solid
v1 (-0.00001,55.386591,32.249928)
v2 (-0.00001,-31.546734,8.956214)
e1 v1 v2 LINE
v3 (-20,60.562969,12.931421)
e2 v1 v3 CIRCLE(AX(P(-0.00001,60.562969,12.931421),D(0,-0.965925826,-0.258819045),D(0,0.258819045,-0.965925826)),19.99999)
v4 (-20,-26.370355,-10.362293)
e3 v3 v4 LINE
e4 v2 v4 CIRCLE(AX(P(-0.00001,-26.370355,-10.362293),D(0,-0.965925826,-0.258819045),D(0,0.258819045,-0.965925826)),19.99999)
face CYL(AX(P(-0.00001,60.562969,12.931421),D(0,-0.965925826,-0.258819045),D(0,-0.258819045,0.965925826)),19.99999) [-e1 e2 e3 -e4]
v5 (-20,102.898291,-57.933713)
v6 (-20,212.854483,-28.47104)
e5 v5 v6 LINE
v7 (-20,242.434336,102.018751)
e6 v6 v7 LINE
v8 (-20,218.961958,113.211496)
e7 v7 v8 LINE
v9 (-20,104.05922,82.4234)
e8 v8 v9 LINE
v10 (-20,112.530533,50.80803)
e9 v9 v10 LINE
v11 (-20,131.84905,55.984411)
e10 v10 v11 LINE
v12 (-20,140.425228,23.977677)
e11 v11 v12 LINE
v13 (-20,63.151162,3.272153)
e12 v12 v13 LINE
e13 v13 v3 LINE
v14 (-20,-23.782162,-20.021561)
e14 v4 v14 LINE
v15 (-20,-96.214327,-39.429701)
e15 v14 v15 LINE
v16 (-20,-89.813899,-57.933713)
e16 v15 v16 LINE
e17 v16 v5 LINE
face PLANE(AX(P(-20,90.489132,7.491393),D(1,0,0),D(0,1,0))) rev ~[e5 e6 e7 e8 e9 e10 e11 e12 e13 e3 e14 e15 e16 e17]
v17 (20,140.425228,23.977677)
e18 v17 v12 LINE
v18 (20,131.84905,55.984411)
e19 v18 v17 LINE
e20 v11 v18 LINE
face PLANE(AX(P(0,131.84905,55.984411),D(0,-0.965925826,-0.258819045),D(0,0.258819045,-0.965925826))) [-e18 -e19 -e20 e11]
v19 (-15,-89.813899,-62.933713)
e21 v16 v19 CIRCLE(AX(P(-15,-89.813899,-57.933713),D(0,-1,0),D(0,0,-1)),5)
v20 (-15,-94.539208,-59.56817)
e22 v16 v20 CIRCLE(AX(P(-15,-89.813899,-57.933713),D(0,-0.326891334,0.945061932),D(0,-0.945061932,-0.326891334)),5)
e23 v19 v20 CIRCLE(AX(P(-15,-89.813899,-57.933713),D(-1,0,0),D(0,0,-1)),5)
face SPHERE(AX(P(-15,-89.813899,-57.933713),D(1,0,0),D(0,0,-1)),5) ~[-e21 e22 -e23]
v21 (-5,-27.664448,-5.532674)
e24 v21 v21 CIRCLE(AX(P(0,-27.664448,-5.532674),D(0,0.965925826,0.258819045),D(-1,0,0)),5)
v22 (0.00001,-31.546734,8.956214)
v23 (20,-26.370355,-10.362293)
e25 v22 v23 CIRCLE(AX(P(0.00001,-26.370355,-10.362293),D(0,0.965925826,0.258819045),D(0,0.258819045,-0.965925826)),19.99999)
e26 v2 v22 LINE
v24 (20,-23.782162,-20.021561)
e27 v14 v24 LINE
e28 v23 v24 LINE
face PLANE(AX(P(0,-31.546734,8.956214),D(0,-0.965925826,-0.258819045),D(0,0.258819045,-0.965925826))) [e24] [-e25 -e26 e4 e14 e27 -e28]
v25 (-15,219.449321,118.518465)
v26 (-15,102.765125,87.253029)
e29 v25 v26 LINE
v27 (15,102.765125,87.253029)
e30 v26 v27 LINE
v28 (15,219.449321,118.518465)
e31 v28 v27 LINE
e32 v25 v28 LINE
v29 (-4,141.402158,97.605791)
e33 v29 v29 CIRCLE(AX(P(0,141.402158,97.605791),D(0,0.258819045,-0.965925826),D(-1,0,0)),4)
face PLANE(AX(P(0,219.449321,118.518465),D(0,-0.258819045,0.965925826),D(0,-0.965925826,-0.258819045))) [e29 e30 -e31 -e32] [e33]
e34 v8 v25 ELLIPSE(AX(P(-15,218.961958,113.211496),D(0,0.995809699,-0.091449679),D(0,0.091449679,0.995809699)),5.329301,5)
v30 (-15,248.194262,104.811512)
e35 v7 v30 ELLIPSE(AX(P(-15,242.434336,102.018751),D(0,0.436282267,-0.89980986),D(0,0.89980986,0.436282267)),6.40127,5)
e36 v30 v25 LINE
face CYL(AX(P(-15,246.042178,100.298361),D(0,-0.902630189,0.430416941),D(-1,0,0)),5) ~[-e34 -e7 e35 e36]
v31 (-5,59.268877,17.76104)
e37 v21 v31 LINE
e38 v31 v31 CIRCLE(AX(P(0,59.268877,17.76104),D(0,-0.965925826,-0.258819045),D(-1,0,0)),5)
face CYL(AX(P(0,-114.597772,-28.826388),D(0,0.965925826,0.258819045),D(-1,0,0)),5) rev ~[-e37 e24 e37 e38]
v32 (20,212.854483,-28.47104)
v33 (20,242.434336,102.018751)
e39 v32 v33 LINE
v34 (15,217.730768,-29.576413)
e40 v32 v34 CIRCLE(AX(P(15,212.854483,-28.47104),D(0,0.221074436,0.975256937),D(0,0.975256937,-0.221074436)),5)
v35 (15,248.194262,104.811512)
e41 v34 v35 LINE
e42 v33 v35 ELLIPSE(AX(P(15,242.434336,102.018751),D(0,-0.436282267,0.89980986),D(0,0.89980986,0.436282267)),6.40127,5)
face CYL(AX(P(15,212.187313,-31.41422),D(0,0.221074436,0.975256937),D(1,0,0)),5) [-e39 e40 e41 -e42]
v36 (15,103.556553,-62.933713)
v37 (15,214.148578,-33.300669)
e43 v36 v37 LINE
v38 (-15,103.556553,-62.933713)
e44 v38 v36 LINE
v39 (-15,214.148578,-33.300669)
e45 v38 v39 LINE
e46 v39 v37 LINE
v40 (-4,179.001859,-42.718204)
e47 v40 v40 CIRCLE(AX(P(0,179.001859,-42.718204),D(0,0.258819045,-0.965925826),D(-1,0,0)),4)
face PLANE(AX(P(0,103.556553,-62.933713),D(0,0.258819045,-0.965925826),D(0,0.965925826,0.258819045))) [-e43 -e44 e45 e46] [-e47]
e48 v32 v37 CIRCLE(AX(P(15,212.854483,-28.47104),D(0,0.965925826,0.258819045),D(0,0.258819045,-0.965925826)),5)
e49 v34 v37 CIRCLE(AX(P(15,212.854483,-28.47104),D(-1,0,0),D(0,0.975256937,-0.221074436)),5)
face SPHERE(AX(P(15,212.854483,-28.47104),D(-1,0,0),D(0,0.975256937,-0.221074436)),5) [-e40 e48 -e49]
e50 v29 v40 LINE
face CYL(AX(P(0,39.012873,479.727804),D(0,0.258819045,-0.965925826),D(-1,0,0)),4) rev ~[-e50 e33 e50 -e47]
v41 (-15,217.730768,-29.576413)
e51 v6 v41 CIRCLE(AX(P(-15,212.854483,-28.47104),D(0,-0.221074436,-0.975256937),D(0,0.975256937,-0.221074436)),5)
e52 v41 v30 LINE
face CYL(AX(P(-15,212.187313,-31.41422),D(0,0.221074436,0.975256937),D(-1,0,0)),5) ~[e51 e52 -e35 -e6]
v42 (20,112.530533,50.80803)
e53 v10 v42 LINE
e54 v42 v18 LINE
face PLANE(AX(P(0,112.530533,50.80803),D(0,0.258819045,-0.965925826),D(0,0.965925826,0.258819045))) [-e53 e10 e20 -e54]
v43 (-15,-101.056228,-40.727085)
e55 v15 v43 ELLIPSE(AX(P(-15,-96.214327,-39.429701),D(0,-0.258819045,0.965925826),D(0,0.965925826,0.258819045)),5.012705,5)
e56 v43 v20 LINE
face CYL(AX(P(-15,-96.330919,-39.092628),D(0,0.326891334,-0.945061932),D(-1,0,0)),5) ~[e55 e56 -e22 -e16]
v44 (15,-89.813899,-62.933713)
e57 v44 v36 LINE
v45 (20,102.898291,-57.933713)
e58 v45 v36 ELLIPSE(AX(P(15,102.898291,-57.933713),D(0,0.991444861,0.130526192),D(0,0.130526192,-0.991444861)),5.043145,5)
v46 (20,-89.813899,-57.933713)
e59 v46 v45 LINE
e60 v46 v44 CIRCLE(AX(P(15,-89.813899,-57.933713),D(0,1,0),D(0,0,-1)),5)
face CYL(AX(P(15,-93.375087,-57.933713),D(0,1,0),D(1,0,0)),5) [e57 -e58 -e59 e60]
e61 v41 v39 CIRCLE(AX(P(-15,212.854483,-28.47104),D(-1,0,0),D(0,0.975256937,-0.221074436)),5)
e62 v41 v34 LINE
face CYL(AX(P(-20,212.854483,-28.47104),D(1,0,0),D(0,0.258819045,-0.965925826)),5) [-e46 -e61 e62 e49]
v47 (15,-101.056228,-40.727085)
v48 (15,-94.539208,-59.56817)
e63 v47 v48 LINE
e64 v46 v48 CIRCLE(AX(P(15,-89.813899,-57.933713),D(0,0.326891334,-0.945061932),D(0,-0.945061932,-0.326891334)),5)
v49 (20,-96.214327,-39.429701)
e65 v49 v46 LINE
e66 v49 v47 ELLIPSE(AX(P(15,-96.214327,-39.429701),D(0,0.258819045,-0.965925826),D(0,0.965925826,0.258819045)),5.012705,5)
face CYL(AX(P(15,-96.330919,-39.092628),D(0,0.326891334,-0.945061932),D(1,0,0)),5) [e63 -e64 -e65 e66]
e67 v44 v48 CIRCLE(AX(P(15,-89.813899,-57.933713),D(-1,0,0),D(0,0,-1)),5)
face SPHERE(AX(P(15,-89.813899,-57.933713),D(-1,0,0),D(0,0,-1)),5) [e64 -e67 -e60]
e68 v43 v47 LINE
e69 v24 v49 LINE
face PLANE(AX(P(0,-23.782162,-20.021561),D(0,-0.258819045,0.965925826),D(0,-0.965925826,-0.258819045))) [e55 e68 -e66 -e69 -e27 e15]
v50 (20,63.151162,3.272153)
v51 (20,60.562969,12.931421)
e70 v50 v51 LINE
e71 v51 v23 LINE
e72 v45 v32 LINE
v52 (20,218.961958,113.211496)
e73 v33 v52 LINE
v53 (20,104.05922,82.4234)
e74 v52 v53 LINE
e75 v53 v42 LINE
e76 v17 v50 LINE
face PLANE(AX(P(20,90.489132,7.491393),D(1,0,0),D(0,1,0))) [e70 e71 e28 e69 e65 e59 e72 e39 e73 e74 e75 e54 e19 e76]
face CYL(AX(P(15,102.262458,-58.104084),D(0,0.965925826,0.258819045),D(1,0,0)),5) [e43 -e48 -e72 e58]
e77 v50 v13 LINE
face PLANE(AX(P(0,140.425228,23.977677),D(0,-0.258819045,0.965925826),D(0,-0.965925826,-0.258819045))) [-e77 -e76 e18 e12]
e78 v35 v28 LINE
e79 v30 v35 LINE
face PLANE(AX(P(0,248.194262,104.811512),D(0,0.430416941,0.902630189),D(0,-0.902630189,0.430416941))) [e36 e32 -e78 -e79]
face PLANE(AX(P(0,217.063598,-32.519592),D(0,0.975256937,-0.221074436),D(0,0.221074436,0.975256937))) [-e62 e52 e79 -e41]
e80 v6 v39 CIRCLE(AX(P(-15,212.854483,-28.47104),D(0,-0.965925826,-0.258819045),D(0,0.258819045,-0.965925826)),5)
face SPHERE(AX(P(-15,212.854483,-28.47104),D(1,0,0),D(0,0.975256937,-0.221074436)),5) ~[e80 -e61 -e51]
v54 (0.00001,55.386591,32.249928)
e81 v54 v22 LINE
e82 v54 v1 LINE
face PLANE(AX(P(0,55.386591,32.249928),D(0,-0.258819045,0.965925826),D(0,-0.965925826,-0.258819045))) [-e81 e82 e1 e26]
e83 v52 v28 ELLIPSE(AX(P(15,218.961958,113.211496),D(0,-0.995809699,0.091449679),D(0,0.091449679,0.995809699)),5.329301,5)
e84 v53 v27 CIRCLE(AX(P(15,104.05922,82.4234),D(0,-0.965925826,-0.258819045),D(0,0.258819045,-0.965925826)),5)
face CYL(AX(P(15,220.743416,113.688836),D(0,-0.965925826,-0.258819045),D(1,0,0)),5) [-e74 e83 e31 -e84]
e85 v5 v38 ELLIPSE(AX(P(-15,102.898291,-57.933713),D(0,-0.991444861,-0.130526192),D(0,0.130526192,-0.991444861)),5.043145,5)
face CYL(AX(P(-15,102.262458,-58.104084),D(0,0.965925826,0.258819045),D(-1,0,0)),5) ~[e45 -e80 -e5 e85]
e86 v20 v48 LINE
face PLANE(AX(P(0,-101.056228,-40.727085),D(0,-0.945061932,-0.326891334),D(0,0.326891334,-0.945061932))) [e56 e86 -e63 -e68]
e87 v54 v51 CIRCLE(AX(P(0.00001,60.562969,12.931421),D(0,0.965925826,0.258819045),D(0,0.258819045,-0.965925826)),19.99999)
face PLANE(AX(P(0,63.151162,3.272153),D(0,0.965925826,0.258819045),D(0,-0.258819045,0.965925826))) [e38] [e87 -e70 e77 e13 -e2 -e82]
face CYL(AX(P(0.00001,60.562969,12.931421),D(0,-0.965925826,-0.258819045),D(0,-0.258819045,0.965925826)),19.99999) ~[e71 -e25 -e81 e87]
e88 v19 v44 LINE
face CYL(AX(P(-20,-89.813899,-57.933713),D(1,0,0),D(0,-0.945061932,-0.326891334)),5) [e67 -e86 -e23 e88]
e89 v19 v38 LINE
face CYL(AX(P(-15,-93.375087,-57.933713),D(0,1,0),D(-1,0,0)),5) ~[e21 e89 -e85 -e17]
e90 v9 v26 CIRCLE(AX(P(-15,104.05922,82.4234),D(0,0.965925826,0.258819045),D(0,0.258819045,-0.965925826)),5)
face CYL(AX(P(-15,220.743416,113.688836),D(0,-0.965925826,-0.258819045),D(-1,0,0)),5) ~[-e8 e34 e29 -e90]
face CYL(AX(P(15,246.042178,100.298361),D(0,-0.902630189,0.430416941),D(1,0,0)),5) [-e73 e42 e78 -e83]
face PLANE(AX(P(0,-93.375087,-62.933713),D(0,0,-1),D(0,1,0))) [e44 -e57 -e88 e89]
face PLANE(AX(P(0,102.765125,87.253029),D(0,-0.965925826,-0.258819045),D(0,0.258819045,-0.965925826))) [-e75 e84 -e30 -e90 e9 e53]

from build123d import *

# Parameters (mm, degrees)
F1_DEPTH = 20
F3_D     = 10
F3_DEPTH = 90
F3_TIP   = 3.0043030951
F4_R     = 19.99999
F5_R     = 5
F7_D     = 8


# Not quite as in the source:
# - a fillet or chamfer is up to 0.001 mm smaller than in the source, because OpenCascade refuses the exact size


with BuildPart() as f1:
    # F0 (on Right) → F1 (new body, symmetric)
    with BuildSketch(Plane.YZ):
        Polygon((55.3865908633, 32.2499277236), (-31.5467335027, 8.9562136644), (-23.7821621496, -20.0215611243), (-101.0562282528, -40.7270847325), (-93.3750867844, -62.9337131977), (103.556553434, -62.9337131977), (217.0635979758, -32.5195922775), (248.1942623854, 104.8115119338), (219.449320977, 118.5184651202), (102.765125102, 87.253029066), (112.5305330656, 50.8080303895), (131.8490495913, 55.9844112915), (140.4252283195, 23.9776765432), (63.1511622164, 3.272152935), align=None)
    extrude(amount=F1_DEPTH, both=True)

    # F3
    with Locations(Plane(origin=(0, -27.1944496451, -7.286730821), x_dir=(1, 0, 0), z_dir=(0, -0.9659258263, -0.2588190451))):
        with Locations((0, 1.8159335255)):
            Hole(F3_D / 2, depth=F3_DEPTH)
            with Locations((0, 0, -(F3_DEPTH + F3_TIP / 2))):  # 118° drill point
                Cone(0, F3_D / 2, F3_TIP, mode=Mode.SUBTRACT)

    # F4 (radius 20 in the source; OpenCascade refuses exactly that, so slightly less here)
    f4_edges = [f1.edges().sort_by_distance(p)[0] for p in [
        (20, 11.919929, 20.603071),
        (-20, 11.919929, 20.603071),
    ]]
    fillet(f4_edges, radius=F4_R)

    # F5
    f5_edges = [f1.edges().sort_by_distance(p)[0] for p in [
        (-20, -97.215658, -51.830399),
        (20, -97.215658, -51.830399),
        (0, -93.375087, -62.933713),
        (20, 5.090733, -62.933713),
        (-20, 5.090733, -62.933713),
        (20, 160.310076, -47.726653),
        (-20, 160.310076, -47.726653),
        (0, 217.063598, -32.519592),
        (20, 232.62893, 36.14596),
        (-20, 232.62893, 36.14596),
        (-20, 233.821792, 111.664989),
        (20, 233.821792, 111.664989),
        (20, 161.107223, 102.885747),
        (-20, 161.107223, 102.885747),
    ]]
    fillet(f5_edges, radius=F5_R)

    # F7 (through all)
    with Locations(Plane(origin=(0, -14.9292991962, 55.7169031216), x_dir=(1, 0, 0), z_dir=(0, -0.2588190451, 0.9659258263))):
        with Locations((0, 161.846234043)):
            Hole(F7_D / 2)


solid = f1.part
